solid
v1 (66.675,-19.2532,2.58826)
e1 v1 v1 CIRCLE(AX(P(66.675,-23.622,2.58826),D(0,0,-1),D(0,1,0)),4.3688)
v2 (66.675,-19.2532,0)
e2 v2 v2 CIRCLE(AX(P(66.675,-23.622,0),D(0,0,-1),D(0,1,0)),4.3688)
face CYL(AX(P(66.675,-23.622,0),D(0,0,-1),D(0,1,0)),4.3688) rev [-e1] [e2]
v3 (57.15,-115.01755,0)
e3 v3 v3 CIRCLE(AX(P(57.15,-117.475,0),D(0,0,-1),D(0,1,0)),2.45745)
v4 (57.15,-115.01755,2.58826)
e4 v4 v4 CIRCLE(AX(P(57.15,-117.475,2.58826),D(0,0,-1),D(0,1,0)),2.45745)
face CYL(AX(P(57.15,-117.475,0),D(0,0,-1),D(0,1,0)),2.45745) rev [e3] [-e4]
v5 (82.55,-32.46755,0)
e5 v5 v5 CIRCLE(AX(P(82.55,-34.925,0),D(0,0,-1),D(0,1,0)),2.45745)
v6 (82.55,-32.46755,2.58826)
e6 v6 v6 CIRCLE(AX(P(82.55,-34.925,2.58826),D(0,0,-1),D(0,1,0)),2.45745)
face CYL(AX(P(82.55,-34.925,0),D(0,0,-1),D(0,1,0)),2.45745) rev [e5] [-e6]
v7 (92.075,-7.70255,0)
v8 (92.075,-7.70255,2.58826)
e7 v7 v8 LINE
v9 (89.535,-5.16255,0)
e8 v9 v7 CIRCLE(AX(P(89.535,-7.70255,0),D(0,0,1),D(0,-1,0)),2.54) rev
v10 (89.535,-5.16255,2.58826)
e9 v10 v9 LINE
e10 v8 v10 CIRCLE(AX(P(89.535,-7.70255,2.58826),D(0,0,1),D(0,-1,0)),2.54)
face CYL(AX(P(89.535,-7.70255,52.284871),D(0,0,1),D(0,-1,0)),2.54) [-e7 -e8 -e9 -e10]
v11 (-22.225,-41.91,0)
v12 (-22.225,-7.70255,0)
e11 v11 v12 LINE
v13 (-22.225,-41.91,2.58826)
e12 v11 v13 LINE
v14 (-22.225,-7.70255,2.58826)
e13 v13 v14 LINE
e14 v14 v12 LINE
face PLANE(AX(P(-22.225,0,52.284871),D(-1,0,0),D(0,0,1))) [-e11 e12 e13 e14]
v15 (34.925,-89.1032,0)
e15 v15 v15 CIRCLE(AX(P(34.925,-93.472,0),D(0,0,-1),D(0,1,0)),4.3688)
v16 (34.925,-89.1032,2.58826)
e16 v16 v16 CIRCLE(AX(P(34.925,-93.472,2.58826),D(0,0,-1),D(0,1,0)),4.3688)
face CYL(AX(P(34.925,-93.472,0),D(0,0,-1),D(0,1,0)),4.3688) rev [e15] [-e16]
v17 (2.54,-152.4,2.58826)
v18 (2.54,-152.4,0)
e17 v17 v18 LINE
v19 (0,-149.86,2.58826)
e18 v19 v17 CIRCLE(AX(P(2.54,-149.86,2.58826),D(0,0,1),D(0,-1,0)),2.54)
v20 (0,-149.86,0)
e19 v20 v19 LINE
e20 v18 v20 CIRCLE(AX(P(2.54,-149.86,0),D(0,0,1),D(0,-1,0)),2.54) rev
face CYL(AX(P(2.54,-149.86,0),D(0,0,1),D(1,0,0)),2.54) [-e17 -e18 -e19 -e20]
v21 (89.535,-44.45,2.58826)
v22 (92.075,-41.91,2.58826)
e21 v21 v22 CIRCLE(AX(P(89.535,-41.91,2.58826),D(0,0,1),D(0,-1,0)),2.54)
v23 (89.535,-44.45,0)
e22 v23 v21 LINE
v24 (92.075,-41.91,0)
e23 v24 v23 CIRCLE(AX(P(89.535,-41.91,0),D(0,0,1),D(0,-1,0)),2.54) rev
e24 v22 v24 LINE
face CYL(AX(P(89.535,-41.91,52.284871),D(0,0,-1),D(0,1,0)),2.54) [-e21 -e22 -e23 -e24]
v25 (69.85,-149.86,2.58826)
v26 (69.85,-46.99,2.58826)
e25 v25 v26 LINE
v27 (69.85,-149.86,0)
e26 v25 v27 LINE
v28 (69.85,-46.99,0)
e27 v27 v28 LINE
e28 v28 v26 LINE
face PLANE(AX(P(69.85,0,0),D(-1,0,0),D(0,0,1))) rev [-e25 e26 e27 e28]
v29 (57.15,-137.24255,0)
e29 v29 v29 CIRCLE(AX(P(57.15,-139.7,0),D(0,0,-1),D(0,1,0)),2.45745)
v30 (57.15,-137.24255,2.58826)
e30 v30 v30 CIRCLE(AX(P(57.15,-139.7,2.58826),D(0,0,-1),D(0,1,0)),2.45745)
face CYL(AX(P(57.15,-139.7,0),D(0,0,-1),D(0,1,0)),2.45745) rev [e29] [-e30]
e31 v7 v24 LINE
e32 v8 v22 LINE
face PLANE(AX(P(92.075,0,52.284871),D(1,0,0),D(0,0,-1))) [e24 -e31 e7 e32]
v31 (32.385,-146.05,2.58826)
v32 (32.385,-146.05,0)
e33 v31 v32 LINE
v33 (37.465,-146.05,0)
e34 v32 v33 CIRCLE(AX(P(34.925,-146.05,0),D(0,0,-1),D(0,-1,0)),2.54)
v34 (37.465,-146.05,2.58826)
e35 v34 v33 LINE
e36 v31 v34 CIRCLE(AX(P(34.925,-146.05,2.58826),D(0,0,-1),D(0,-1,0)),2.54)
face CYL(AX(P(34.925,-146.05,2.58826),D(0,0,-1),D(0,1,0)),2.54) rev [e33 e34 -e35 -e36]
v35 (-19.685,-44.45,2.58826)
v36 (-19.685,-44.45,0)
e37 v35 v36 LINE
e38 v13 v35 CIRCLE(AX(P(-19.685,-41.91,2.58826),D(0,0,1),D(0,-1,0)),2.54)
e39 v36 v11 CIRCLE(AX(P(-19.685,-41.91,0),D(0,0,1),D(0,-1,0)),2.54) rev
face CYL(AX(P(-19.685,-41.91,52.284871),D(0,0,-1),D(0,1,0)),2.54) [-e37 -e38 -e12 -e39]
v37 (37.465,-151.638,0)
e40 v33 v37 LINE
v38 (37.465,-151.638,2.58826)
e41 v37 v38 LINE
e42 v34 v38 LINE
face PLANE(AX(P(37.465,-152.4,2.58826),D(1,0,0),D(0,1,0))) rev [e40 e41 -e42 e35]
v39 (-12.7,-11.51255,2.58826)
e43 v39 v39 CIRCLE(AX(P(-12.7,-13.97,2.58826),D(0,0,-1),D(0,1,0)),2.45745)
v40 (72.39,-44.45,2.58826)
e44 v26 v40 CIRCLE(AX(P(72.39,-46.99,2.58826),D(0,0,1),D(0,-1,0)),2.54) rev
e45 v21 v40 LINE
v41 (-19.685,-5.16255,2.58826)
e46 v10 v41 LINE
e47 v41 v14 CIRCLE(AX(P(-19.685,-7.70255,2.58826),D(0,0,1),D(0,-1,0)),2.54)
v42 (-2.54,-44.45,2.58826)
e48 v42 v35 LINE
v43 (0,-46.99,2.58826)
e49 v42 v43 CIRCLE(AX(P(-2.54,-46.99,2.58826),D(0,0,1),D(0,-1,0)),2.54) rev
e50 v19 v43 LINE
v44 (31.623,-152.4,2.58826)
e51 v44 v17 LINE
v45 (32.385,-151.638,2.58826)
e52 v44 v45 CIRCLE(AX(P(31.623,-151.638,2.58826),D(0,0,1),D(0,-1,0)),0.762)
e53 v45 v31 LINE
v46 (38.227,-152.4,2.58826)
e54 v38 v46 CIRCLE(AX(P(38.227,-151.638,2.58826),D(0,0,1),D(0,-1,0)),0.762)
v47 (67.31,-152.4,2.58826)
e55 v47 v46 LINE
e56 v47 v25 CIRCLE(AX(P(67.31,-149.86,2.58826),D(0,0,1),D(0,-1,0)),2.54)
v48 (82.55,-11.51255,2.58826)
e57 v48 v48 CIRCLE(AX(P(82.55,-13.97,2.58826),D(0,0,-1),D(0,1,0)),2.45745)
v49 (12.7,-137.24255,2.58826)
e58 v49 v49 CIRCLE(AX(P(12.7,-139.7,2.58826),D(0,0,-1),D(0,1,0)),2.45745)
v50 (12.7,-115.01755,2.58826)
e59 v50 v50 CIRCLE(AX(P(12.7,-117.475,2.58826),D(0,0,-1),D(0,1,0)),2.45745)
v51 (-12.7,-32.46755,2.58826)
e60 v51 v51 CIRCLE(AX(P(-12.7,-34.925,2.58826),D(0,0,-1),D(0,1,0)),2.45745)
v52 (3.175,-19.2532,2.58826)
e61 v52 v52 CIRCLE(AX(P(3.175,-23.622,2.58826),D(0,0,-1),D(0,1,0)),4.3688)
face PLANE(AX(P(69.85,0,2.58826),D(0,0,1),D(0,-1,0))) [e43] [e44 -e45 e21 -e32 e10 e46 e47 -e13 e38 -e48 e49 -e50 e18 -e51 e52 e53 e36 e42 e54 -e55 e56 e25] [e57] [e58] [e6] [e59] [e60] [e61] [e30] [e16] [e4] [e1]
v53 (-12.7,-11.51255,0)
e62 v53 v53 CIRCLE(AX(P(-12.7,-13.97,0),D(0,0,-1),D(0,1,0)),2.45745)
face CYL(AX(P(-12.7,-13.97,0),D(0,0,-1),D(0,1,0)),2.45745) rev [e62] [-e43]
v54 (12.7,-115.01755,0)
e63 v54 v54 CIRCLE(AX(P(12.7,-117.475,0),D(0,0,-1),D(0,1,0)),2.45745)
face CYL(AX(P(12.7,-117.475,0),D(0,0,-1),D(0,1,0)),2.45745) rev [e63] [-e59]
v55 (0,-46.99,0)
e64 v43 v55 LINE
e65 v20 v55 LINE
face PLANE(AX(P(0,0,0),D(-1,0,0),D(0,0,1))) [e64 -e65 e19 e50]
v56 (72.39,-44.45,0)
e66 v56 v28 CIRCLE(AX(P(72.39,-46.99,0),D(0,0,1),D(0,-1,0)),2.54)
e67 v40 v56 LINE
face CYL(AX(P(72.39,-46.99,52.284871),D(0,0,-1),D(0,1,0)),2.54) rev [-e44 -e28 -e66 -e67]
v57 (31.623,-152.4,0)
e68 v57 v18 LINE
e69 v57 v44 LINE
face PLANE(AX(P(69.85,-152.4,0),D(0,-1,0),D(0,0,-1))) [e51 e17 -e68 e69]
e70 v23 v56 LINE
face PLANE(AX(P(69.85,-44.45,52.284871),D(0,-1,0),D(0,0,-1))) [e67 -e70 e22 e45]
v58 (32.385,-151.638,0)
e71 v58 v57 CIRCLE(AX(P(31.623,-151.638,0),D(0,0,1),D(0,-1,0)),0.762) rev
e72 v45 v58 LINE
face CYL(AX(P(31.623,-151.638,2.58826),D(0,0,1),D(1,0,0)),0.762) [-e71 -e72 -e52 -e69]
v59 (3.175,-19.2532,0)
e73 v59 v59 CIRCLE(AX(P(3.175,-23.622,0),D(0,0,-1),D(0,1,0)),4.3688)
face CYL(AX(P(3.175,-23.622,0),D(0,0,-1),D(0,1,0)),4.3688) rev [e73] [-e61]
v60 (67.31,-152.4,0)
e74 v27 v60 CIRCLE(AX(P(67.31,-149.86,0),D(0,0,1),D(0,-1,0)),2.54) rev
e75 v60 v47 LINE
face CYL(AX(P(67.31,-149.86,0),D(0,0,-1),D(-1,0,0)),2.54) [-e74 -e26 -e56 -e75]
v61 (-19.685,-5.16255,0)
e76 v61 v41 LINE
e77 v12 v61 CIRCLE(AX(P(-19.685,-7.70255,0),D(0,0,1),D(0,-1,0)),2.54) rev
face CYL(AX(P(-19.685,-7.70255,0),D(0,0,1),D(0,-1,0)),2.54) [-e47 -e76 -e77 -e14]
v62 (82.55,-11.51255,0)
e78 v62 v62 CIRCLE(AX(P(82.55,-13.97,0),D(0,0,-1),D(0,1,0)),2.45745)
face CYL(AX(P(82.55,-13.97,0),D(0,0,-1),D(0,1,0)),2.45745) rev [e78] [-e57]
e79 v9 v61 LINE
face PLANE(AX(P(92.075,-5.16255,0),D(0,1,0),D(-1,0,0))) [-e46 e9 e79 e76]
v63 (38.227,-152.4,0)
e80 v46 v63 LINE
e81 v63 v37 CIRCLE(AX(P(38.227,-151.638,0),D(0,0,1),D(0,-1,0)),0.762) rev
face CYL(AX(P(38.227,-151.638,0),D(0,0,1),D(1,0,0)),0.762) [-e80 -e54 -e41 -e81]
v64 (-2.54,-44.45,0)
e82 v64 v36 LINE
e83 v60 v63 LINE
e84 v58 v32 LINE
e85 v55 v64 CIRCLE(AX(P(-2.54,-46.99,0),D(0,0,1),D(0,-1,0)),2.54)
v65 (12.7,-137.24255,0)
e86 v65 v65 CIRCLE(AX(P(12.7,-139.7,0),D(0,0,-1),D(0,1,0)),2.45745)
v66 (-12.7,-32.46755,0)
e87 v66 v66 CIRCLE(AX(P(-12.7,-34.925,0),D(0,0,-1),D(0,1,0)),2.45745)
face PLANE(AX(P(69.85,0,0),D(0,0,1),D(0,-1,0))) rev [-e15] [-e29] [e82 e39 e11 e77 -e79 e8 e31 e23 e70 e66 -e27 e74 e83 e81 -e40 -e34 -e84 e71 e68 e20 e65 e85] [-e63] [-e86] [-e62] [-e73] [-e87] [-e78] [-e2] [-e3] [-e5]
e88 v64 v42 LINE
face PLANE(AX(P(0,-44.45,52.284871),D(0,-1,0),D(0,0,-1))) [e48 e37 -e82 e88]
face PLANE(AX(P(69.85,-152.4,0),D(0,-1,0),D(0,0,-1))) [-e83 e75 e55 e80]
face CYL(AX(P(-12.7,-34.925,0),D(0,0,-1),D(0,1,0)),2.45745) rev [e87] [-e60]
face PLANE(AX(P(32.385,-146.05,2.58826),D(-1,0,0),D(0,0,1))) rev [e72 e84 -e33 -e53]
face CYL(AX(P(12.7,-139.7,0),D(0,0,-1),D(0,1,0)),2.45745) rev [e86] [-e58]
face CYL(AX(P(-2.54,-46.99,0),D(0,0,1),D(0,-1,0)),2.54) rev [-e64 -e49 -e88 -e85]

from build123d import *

# Parameters (mm, degrees)
SKETCH1_W                                 = 2.58826
SKETCH1_H                                 = 152.4
BASE_FLANGE1_DEPTH                        = 69.85
SKETCH2_W                                 = 22.225
SKETCH2_H                                 = 44.45
BOSS_EXTRUDE1_DEPTH                       = 2.58826
F_10_0_1935_DIAMETER_HOLE1_D              = 4.9149
SKETCH5_W                                 = 114.3
SKETCH5_H                                 = 5.16255
CUT_EXTRUDE1_DEPTH                        = 179.073762006
FILLET1_R                                 = 2.54
HOLE_FOR_1_4_SELF_CLINCHING_NUTS_S_SS_C_D = 8.7376
CUT_EXTRUDE2_DEPTH                        = 179.073762006
FILLET2_R                                 = 0.762


# Sheet-metal steps are written as plain solids
with BuildPart() as part:
    # Sketch1 → Base-Flange1 (new body)
    with BuildSketch(Plane(origin=(0, 0, 0), x_dir=(0, 0, -1), z_dir=(1, 0, 0))):
        with Locations((-1.29413, -76.2)):
            Rectangle(SKETCH1_W, SKETCH1_H)
    extrude(amount=BASE_FLANGE1_DEPTH)

    # Sketch2 → Boss-Extrude1 (add)
    with BuildSketch(Plane(origin=(0, 0, 0), x_dir=(-1, 0, 0), z_dir=(0, 0, -1))):
        with Locations((-80.9625, -22.225)):
            Rectangle(SKETCH2_W, SKETCH2_H)
        with Locations((11.1125, -22.225)):
            Rectangle(SKETCH2_W, SKETCH2_H)
    extrude(amount=-BOSS_EXTRUDE1_DEPTH)

    # #10 (0.1935) Diameter Hole1 (through all)
    with Locations(Plane(origin=(0, 0, 0), x_dir=(-1, 0, 0), z_dir=(0, 0, -1))):
        with Locations((-82.55, -13.97), (-82.55, -34.925), (12.7, -34.925), (12.7, -13.97), (-57.15, -117.475), (-57.15, -139.7), (-12.7, -139.7), (-12.7, -117.475)):
            Hole(F_10_0_1935_DIAMETER_HOLE1_D / 2)

    # Sketch5 → Cut-Extrude1 (cut, through all)
    with BuildSketch(Plane(origin=(0, 0, 0), x_dir=(-1, 0, 0), z_dir=(0, 0, -1))):
        with Locations((-34.925, -2.581275)):
            Rectangle(SKETCH5_W, SKETCH5_H)
    extrude(amount=-CUT_EXTRUDE1_DEPTH, mode=Mode.SUBTRACT)

    # Fillet1
    fillet1_edges = [part.edges().sort_by_distance(p)[0] for p in [
        (92.075, -44.45, 1.29413),
        (69.85, -44.45, 1.29413),
        (69.85, -152.4, 1.29413),
        (0, -44.45, 1.29413),
        (-22.225, -44.45, 1.29413),
        (0, -152.4, 1.29413),
        (92.075, -5.16255, 1.29413),
        (-22.225, -5.16255, 1.29413),
    ]]
    fillet(fillet1_edges, radius=FILLET1_R)

    # Hole for 1/4 Self-clinching Nuts (S,SS,CLS,CLSS)1 (through all)
    with Locations(Plane(origin=(0, 0, 0), x_dir=(-1, 0, 0), z_dir=(0, 0, -1))):
        with Locations((-66.675, -23.622), (-3.175, -23.622), (-34.925, -93.472)):
            Hole(HOLE_FOR_1_4_SELF_CLINCHING_NUTS_S_SS_C_D / 2)

    # Sketch8 → Cut-Extrude2 (cut, through all)
    with BuildSketch(Plane(origin=(0, 0, 0), x_dir=(-1, 0, 0), z_dir=(0, 0, -1))):
        with BuildLine():
            Line((-37.465, -152.4), (-37.465, -146.05))
            ThreePointArc((-37.465, -146.05), (-34.925, -143.51), (-32.385, -146.05))
            Line((-32.385, -146.05), (-32.385, -152.4))
            Line((-32.385, -152.4), (-37.465, -152.4))
        make_face()
    extrude(amount=-CUT_EXTRUDE2_DEPTH, mode=Mode.SUBTRACT)

    # Fillet2
    fillet2_edges = [part.edges().sort_by_distance(p)[0] for p in [
        (32.385, -152.4, 1.29413),
        (37.465, -152.4, 1.29413),
    ]]
    fillet(fillet2_edges, radius=FILLET2_R)


solid = part.part
